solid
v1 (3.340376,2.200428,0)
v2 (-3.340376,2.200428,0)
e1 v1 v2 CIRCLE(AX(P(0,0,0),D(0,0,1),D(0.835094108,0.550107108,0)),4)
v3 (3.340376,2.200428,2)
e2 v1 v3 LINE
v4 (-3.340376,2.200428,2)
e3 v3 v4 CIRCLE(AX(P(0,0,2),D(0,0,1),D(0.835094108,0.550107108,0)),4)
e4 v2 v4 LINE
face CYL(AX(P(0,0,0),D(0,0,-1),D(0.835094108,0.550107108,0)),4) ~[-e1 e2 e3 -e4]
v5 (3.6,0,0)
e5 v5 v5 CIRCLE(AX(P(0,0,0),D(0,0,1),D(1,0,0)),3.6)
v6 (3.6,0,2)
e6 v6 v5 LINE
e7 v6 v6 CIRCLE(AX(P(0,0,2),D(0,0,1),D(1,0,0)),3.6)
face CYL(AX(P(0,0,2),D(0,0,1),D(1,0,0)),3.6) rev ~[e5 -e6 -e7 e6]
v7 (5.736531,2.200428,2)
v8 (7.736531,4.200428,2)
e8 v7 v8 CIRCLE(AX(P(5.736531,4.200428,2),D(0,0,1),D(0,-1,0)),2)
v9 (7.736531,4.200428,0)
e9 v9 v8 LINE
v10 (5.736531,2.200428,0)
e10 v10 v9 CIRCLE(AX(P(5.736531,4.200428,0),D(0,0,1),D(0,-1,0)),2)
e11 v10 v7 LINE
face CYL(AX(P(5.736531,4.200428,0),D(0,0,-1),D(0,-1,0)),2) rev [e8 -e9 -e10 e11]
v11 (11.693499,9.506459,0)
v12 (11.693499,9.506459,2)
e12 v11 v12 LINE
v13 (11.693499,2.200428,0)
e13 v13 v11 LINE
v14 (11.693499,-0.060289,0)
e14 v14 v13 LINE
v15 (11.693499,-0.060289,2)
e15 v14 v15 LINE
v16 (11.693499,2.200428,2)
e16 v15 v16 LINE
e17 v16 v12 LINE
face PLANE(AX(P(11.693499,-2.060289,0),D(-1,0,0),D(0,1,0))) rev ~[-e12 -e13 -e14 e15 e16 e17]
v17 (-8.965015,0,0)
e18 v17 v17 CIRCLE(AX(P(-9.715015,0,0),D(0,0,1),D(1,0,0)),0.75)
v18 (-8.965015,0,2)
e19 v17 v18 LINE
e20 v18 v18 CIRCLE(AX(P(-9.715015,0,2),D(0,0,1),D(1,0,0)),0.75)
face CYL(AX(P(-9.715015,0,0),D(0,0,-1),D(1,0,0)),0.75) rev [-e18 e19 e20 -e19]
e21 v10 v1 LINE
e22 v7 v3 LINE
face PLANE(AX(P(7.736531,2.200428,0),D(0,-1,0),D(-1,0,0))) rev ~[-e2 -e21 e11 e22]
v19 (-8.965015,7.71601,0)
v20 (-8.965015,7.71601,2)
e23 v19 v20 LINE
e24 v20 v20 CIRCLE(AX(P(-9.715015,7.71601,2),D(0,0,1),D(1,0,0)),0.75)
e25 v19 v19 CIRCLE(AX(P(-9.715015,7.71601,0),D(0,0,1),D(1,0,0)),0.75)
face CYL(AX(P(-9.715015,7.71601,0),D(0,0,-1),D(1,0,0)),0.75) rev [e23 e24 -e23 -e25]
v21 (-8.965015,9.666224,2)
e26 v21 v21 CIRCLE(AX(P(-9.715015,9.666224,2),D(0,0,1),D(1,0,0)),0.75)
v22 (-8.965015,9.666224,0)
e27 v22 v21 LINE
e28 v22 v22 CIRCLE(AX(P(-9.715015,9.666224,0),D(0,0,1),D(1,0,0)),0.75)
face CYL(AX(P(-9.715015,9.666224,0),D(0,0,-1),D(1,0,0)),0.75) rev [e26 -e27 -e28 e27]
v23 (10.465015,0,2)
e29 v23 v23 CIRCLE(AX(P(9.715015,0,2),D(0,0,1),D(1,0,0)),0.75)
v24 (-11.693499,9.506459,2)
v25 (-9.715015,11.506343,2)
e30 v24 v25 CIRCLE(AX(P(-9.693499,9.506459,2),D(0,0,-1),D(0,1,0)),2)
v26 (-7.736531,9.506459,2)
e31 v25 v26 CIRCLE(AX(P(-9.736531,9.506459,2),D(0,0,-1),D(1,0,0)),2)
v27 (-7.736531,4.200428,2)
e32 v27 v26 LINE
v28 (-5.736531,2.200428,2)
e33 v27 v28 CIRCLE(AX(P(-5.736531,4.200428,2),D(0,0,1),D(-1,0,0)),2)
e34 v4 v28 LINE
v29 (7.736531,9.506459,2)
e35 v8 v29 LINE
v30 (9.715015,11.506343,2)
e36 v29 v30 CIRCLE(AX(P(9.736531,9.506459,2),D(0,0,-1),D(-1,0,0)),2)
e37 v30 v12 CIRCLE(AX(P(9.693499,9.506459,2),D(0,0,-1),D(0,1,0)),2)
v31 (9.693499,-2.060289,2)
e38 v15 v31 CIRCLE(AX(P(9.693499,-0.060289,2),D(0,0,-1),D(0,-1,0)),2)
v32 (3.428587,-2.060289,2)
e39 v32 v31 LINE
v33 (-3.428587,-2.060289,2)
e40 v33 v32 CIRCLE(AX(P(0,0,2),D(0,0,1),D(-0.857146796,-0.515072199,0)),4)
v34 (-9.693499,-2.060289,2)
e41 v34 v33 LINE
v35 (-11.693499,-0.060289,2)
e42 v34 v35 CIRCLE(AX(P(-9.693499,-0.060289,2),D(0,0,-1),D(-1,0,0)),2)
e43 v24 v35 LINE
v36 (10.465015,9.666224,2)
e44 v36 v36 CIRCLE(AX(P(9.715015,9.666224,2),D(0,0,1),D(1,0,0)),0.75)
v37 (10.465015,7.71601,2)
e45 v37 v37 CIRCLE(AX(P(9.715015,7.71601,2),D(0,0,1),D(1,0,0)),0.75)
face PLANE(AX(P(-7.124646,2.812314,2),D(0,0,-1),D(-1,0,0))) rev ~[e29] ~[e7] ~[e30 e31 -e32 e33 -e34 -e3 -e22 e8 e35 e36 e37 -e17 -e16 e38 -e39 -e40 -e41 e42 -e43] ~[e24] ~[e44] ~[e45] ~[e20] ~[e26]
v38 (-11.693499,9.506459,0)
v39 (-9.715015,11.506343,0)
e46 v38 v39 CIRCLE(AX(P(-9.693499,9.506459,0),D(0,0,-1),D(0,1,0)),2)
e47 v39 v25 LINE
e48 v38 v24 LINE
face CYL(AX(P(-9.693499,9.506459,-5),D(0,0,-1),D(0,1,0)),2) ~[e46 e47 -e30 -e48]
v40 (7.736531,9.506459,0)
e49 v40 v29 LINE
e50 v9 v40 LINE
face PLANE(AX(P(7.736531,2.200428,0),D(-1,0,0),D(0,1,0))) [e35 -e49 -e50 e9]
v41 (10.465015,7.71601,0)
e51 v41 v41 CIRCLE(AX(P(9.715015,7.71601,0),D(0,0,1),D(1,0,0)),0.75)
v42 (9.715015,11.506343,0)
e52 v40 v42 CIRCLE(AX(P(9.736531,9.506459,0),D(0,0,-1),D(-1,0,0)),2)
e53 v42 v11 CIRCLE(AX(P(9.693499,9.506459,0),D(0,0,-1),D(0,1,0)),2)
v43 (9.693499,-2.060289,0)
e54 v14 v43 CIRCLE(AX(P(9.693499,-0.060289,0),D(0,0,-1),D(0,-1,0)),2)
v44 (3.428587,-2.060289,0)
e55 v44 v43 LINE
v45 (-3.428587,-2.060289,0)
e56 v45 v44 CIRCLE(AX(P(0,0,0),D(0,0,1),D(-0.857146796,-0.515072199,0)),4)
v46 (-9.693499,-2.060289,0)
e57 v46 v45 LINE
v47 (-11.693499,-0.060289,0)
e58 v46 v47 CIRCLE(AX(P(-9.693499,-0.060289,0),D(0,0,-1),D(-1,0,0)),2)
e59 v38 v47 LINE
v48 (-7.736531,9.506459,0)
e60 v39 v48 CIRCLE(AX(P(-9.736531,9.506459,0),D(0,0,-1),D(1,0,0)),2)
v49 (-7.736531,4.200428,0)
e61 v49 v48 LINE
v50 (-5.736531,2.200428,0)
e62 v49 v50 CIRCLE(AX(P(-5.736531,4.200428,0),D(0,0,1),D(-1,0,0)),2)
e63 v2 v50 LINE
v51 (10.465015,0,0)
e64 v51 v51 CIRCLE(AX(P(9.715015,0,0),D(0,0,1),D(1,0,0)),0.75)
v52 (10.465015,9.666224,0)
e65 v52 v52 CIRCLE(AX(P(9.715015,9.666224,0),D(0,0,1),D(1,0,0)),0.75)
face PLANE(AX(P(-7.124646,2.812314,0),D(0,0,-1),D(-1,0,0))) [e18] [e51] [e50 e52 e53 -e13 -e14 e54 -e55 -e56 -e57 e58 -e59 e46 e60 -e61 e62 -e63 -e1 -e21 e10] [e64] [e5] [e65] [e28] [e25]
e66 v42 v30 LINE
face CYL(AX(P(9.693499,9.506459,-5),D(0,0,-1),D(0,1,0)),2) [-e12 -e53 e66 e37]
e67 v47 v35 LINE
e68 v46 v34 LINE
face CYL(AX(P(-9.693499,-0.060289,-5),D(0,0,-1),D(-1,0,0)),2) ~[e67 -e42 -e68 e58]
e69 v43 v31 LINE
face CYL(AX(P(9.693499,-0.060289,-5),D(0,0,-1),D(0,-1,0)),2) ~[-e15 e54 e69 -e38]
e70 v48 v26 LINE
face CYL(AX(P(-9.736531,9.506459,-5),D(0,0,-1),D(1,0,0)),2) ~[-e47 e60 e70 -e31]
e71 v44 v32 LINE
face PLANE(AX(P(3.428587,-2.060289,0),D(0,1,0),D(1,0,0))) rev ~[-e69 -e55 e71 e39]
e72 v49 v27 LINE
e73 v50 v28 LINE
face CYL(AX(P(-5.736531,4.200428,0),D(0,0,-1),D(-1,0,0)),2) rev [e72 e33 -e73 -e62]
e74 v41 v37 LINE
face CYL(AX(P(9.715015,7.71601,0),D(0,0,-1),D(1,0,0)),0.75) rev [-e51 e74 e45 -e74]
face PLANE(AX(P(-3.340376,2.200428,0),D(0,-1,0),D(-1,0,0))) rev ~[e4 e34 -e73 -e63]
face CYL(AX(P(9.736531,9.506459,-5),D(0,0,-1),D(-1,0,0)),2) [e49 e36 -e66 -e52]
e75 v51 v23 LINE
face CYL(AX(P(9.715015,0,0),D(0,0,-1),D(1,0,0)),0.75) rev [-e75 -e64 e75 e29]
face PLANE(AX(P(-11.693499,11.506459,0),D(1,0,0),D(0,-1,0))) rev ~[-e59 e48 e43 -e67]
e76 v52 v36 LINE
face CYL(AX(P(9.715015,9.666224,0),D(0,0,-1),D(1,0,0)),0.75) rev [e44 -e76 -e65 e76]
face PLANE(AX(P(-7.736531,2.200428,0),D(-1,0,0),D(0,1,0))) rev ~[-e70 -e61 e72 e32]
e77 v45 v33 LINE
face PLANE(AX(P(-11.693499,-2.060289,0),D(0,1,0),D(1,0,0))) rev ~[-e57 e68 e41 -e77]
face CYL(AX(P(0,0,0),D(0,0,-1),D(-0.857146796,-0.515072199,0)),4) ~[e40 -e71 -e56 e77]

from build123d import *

# Parameters (mm, degrees)
F0_W        = 3.9569679648
F0_H        = 9.3060303107
F0_R        = 0.75
F1_DEPTH    = 2
F2_R        = 3.6
F3_DEPTH    = 25
F4_T1_DEPTH = 2
F4_T3_DEPTH = 12


# Not quite as in the source:
# - a fillet or chamfer that OpenCascade refuses, or shapes differently, is made with other operations: its cross-section is extruded or revolved along the edge and cut away or added


with BuildPart() as f1:
    # F0 (on Top) → F1 (new body)
    with BuildSketch(Plane.XY):
        with Locations((-9.7150150687, 6.8534435891)):
            Rectangle(F0_W, F0_H)
        with Locations((-9.7150150687, 7.7160103247)):
            Circle(F0_R, mode=Mode.SUBTRACT)
        with Locations((-9.7150150687, 9.6662240103)):
            Circle(F0_R, mode=Mode.SUBTRACT)
        with BuildLine():
            ThreePointArc((-3.4285871837, -2.0602887962), (-3.9991430252, 0.0827953119), (-3.3403764321, 2.2004284337))
            Line((-3.3403764321, 2.2004284337), (-7.7365310863, 2.2004284337))
            Line((-7.7365310863, 2.2004284337), (-11.693499051, 2.2004284337))
            Line((-11.693499051, 2.2004284337), (-11.693499051, -2.0602887962))
            Line((-11.693499051, -2.0602887962), (-3.4285871837, -2.0602887962))
        make_face()
        with Locations((-9.7150150687, 0)):
            Circle(F0_R, mode=Mode.SUBTRACT)
        with BuildLine():
            Line((3.3403764321, -2.0602887962), (3.3403764321, 2.2004284337))
            ThreePointArc((3.3403764321, 2.2004284337), (0, 4), (-3.3403764321, 2.2004284337))
            Line((-3.3403764321, 2.2004284337), (-3.3403764321, -2.0602887962))
            Line((-3.3403764321, -2.0602887962), (-3.4285871837, -2.0602887962))
            ThreePointArc((-3.4285871837, -2.0602887962), (0, -4), (3.4285871837, -2.0602887962))
            Line((3.4285871837, -2.0602887962), (3.3403764321, -2.0602887962))
        make_face()
        with BuildLine():
            ThreePointArc((3.3403764321, 2.2004284337), (3.8315470588, 1.1485848405), (4, 0))
            ThreePointArc((4, 0), (3.8545005341, -1.06903023), (3.4285871837, -2.0602887962))
            Line((3.4285871837, -2.0602887962), (11.693499051, -2.0602887962))
            Line((11.693499051, -2.0602887962), (11.693499051, 2.2004284337))
            Line((11.693499051, 2.2004284337), (7.7365310863, 2.2004284337))
            Line((7.7365310863, 2.2004284337), (3.3403764321, 2.2004284337))
        make_face()
        with Locations((9.7150150687, 0)):
            Circle(F0_R, mode=Mode.SUBTRACT)
        with Locations((9.7150150687, 6.8534435891)):
            Rectangle(F0_W, F0_H)
        with Locations((9.7150150687, 7.7160103247)):
            Circle(F0_R, mode=Mode.SUBTRACT)
        with Locations((9.7150150687, 9.6662240103)):
            Circle(F0_R, mode=Mode.SUBTRACT)
        with BuildLine():
            Line((-3.3403764321, -2.0602887962), (-3.3403764321, 2.2004284337))
            ThreePointArc((-3.3403764321, 2.2004284337), (-3.9991430252, 0.0827953119), (-3.4285871837, -2.0602887962))
            Line((-3.4285871837, -2.0602887962), (-3.3403764321, -2.0602887962))
        make_face()
        with BuildLine():
            ThreePointArc((3.4285871837, -2.0602887962), (3.8545005341, -1.06903023), (4, 0))
            ThreePointArc((4, 0), (3.8315470588, 1.1485848405), (3.3403764321, 2.2004284337))
            Line((3.3403764321, 2.2004284337), (3.3403764321, -2.0602887962))
            Line((3.3403764321, -2.0602887962), (3.4285871837, -2.0602887962))
        make_face()
    extrude(amount=F1_DEPTH)

    # F2 (on face) → F3 (cut)
    with BuildSketch(Plane.XY.offset(2)):
        Circle(F2_R)
    extrude(amount=-F3_DEPTH, mode=Mode.SUBTRACT)

    # F4: fillet of radius 2 on 8 edges, made by hand

    # F4_s2 → F4_t1 (join)
    with BuildSketch(Plane.XY):
        with BuildLine():
            ThreePointArc((-7.7365310863, 4.2004284337), (-7.1507446486, 2.7862148714), (-5.7365310863, 2.2004284337))
            Line((-5.7365310863, 2.2004284337), (-7.7365310863, 2.2004284337))
            Line((-7.7365310863, 2.2004284337), (-7.7365310863, 4.2004284337))
        make_face()
        with BuildLine():
            ThreePointArc((5.7365310863, 2.2004284337), (7.1507446486, 2.7862148714), (7.7365310863, 4.2004284337))
            Line((7.7365310863, 4.2004284337), (7.7365310863, 2.2004284337))
            Line((7.7365310863, 2.2004284337), (5.7365310863, 2.2004284337))
        make_face()
    extrude(amount=F4_T1_DEPTH)

    # F4_s4 → F4_t3 (cut)
    with BuildSketch(Plane.XY.offset(-5)):
        with BuildLine():
            ThreePointArc((9.693499051, 11.5064587444), (11.1077126134, 10.9206723068), (11.693499051, 9.5064587444))
            Line((11.693499051, 9.5064587444), (11.693499051, 11.5064587444))
            Line((11.693499051, 11.5064587444), (9.693499051, 11.5064587444))
        make_face()
        with BuildLine():
            ThreePointArc((7.7365310863, 9.5064587444), (8.3223175239, 10.9206723068), (9.7365310863, 11.5064587444))
            Line((9.7365310863, 11.5064587444), (7.7365310863, 11.5064587444))
            Line((7.7365310863, 11.5064587444), (7.7365310863, 9.5064587444))
        make_face()
        with BuildLine():
            ThreePointArc((-7.7365310863, 9.5064587444), (-8.3223175239, 10.9206723068), (-9.7365310863, 11.5064587444))
            Line((-9.7365310863, 11.5064587444), (-7.7365310863, 11.5064587444))
            Line((-7.7365310863, 11.5064587444), (-7.7365310863, 9.5064587444))
        make_face()
        with BuildLine():
            ThreePointArc((-9.693499051, 11.5064587444), (-11.1077126134, 10.9206723068), (-11.693499051, 9.5064587444))
            Line((-11.693499051, 9.5064587444), (-11.693499051, 11.5064587444))
            Line((-11.693499051, 11.5064587444), (-9.693499051, 11.5064587444))
        make_face()
        with BuildLine():
            ThreePointArc((-11.693499051, -0.0602887962), (-11.1077126134, -1.4745023586), (-9.693499051, -2.0602887962))
            Line((-9.693499051, -2.0602887962), (-11.693499051, -2.0602887962))
            Line((-11.693499051, -2.0602887962), (-11.693499051, -0.0602887962))
        make_face()
        with BuildLine():
            ThreePointArc((9.693499051, -2.0602887962), (11.1077126134, -1.4745023586), (11.693499051, -0.0602887962))
            Line((11.693499051, -0.0602887962), (11.693499051, -2.0602887962))
            Line((11.693499051, -2.0602887962), (9.693499051, -2.0602887962))
        make_face()
    extrude(amount=F4_T3_DEPTH, mode=Mode.SUBTRACT)


solid = f1.part
